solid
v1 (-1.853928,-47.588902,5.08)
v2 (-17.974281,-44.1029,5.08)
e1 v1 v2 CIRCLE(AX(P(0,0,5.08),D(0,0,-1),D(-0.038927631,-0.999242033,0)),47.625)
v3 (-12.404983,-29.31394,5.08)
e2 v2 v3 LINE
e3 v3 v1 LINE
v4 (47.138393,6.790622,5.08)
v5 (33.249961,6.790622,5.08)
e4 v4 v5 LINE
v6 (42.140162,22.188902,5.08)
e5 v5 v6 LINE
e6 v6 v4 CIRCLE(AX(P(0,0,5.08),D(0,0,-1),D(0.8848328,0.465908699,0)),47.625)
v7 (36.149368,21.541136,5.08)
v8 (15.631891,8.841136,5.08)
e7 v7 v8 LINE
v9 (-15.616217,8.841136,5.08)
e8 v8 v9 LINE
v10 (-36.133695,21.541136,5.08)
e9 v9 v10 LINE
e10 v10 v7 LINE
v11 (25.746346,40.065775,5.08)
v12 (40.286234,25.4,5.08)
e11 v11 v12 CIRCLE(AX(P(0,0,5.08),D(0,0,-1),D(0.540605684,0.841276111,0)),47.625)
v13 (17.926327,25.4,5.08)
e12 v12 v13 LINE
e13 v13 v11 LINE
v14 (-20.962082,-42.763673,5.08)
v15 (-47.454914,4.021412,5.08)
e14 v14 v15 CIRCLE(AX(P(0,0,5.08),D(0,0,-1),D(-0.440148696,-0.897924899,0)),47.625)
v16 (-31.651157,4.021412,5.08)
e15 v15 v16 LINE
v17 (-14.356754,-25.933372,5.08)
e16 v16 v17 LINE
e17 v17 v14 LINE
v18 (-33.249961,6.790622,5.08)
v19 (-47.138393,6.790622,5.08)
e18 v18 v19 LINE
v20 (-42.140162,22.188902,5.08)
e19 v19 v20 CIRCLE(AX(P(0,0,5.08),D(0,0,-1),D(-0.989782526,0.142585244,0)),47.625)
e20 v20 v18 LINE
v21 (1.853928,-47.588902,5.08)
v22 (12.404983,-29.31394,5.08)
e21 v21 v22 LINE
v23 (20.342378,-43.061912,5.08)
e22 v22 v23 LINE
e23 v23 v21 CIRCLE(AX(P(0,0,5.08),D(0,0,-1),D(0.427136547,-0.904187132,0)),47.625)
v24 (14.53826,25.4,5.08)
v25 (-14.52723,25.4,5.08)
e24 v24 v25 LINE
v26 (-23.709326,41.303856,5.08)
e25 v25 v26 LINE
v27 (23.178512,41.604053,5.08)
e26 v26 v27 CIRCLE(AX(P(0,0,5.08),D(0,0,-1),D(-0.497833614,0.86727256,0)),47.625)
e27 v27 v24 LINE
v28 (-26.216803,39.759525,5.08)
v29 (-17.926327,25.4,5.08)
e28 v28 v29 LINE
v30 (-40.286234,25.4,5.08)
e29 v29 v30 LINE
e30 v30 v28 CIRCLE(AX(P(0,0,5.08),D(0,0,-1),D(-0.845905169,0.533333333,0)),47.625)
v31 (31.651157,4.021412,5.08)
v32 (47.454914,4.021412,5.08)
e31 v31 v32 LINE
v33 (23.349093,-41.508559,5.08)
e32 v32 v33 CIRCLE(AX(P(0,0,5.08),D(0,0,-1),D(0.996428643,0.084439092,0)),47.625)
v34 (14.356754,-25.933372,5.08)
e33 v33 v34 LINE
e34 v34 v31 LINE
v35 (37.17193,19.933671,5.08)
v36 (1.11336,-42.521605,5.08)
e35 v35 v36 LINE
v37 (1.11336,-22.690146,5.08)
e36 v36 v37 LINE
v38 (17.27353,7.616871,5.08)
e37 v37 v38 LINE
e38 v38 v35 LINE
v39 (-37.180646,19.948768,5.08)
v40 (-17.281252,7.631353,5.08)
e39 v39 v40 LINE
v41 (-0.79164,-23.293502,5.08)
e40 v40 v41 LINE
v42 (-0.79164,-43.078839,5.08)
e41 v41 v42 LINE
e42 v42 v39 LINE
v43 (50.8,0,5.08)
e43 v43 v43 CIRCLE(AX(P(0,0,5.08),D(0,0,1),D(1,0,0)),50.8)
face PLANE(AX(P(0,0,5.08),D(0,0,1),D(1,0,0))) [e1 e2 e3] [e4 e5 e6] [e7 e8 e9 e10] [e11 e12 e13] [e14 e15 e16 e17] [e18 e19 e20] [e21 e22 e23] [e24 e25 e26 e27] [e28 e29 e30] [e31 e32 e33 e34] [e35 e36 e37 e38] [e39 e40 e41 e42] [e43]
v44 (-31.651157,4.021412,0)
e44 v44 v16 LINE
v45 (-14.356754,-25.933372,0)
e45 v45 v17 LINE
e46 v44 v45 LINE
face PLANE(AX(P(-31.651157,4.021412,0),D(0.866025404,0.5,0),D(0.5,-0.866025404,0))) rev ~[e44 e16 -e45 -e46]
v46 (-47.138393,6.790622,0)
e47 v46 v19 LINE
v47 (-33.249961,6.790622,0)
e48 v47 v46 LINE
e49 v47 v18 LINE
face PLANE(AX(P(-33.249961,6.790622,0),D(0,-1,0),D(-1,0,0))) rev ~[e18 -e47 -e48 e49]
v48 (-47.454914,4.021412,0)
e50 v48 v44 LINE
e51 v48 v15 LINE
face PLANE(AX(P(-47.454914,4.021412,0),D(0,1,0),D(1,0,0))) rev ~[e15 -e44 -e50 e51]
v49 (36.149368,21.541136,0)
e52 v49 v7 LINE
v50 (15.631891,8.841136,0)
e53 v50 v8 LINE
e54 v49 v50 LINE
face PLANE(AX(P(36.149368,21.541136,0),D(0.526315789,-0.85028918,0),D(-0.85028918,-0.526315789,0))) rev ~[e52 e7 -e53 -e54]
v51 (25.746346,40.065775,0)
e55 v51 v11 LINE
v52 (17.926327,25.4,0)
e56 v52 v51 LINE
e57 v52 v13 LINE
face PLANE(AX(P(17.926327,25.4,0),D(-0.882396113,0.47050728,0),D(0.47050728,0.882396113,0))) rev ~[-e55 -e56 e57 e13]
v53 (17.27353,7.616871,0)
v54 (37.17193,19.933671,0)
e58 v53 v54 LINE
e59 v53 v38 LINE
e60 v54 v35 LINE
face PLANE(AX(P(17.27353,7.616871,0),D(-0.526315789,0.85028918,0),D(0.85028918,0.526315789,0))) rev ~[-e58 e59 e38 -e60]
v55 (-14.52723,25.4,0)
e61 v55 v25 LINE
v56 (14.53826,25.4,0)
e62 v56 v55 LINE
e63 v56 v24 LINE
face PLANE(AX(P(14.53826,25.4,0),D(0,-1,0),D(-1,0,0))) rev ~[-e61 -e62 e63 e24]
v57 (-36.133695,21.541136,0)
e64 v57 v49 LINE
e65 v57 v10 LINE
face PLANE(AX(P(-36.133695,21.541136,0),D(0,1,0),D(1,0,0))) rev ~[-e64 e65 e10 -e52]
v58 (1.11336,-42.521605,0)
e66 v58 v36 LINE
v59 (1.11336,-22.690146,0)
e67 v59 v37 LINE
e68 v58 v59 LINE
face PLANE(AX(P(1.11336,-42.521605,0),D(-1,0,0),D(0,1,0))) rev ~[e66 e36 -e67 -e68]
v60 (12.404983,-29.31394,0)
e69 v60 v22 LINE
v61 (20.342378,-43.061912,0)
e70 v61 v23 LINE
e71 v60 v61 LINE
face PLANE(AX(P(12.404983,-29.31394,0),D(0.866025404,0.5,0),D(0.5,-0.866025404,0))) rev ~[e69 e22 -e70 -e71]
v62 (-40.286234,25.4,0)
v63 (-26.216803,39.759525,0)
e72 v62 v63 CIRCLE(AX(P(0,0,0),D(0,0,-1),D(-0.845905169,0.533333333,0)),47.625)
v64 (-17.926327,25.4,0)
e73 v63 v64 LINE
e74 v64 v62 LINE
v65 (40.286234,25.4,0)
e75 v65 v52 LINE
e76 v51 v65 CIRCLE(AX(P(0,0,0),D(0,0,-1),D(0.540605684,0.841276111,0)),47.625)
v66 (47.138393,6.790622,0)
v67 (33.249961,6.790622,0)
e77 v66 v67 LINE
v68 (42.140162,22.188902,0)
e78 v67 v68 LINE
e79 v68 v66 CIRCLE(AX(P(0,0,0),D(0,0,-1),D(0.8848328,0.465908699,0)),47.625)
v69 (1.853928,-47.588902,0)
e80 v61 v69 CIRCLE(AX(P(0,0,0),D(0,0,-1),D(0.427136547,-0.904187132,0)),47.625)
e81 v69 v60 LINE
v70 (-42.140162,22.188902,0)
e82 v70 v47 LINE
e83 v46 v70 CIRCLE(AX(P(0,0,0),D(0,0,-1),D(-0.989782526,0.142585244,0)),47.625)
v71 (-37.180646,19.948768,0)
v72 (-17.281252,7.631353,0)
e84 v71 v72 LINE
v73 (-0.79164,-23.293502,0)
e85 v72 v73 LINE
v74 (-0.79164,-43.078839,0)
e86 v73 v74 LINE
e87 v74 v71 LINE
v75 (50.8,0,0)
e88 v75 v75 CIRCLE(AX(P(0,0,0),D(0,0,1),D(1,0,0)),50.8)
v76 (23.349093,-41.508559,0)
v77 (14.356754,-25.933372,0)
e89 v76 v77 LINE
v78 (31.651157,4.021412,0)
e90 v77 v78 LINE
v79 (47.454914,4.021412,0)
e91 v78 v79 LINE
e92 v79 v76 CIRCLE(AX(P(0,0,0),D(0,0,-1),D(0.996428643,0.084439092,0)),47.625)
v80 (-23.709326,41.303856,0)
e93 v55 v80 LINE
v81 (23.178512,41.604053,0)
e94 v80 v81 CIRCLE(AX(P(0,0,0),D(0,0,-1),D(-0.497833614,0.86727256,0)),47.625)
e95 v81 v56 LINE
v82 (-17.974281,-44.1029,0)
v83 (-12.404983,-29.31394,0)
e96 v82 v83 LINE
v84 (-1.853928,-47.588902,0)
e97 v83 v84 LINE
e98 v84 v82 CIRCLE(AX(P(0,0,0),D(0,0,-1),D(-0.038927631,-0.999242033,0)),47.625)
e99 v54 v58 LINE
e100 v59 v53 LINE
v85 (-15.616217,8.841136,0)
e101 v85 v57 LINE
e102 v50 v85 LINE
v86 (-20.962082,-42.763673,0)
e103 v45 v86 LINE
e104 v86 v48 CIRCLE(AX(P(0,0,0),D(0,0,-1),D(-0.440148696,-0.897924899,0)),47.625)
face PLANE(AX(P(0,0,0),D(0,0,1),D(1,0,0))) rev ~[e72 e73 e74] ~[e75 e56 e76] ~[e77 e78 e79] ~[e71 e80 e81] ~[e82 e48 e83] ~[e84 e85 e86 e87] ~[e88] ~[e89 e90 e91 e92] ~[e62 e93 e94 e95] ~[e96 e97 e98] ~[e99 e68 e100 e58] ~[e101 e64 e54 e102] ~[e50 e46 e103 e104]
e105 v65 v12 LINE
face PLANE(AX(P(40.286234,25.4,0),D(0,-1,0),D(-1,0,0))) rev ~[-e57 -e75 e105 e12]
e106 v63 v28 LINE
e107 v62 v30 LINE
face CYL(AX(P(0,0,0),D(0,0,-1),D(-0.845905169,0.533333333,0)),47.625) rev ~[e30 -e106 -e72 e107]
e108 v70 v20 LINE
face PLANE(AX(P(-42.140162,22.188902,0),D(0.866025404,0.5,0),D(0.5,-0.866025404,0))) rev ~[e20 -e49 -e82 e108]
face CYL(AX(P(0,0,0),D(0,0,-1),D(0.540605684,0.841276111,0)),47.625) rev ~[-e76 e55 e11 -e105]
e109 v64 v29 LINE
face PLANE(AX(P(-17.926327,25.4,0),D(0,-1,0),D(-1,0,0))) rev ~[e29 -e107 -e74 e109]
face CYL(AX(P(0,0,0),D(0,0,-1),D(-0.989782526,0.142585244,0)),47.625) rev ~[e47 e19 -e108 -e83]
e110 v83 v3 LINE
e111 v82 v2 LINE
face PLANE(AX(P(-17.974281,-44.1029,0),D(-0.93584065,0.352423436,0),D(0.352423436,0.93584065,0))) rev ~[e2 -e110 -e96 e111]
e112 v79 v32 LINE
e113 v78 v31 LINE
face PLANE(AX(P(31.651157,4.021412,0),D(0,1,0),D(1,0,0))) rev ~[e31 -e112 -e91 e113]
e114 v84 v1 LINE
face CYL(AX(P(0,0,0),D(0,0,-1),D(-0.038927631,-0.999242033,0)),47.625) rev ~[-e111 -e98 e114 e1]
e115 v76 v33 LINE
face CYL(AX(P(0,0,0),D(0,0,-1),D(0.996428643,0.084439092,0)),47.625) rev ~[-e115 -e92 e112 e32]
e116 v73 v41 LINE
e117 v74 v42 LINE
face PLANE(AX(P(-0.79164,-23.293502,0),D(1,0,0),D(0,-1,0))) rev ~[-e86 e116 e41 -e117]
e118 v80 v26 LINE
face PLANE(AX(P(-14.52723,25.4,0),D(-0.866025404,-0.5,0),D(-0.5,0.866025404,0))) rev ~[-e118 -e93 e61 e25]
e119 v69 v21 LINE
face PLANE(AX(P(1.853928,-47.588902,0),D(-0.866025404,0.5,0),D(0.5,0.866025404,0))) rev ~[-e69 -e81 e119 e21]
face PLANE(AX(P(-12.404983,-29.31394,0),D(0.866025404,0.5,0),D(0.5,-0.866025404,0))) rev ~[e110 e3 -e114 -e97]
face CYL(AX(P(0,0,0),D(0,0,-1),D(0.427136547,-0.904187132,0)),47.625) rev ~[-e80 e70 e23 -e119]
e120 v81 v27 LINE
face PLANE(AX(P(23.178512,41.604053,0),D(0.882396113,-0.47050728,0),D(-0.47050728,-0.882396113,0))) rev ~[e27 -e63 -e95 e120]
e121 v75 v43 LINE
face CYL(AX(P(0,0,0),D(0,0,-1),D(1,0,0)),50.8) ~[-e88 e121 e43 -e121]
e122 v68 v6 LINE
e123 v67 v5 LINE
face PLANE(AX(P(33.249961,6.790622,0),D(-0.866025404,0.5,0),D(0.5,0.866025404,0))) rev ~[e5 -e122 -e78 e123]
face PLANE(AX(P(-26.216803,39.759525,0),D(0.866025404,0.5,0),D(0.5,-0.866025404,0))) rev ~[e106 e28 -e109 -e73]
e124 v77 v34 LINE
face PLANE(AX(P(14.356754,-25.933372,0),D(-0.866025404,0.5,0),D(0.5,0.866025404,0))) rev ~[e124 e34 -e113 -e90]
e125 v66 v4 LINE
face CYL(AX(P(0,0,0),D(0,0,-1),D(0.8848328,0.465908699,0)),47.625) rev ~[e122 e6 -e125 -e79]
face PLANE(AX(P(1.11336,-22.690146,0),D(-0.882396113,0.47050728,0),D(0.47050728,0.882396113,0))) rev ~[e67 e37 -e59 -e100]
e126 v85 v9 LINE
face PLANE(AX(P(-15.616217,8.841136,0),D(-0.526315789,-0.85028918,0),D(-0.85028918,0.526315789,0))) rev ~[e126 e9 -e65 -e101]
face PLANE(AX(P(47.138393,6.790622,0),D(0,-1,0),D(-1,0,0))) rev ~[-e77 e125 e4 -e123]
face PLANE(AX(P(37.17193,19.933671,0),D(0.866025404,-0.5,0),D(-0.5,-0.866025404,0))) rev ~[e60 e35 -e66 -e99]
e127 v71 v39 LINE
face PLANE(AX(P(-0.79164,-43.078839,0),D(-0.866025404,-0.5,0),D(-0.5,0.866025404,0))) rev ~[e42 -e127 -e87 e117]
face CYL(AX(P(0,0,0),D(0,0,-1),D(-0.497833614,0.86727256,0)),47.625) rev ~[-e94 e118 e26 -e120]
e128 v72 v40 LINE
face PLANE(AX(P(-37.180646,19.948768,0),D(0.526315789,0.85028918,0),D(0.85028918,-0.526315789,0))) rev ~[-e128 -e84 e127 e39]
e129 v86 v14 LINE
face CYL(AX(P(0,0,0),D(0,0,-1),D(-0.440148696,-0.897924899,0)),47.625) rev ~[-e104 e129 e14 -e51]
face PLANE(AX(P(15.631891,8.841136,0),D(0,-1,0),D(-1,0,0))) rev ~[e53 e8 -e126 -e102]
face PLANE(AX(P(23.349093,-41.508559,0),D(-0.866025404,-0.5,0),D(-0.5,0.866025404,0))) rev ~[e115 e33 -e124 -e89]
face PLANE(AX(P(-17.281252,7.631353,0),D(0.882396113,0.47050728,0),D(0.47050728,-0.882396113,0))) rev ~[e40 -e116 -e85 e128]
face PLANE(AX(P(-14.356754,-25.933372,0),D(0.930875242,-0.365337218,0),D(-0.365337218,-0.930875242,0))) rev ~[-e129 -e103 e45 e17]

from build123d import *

# Parameters (mm, degrees)
F0_R     = 50.8
F1_DEPTH = 5.08


# Not quite as in the source:
# - a feature names something its author has since deleted; it is built from what else it names


with BuildPart() as f1:
    # F0 (on Top) → F1 (new body)
    with BuildSketch(Plane.XY):
        Circle(F0_R)
        with BuildLine():
            Line((-17.9742814731, -44.1029004775), (-12.4049825801, -29.3139399042))
            Line((-12.4049825801, -29.3139399042), (-1.8539284107, -47.5889017991))
            ThreePointArc((-1.8539284107, -47.5889017991), (-10.066157564, -46.549039699), (-17.9742814731, -44.1029004775))
        make_face(mode=Mode.SUBTRACT)
        with BuildLine():
            ThreePointArc((-20.9620816677, -42.7636733356), (-41.4419156704, -23.4671738939), (-47.4549141022, 4.0214117617))
            Line((-47.4549141022, 4.0214117617), (-31.651156838, 4.0214117617))
            Line((-31.651156838, 4.0214117617), (-14.3567544825, -25.9333718046))
            Line((-14.3567544825, -25.9333718046), (-20.9620816677, -42.7636733356))
        make_face(mode=Mode.SUBTRACT)
        Polygon((-0.7916404097, -43.0788385891), (-37.1806461747, 19.9487682329), (-17.281252241, 7.6313526128), (-0.7916404097, -23.293502324), align=None, mode=Mode.SUBTRACT)
        with BuildLine():
            ThreePointArc((20.3423780674, -43.061912168), (11.3266241262, -46.2584933921), (1.8539284107, -47.5889017991))
            Line((1.8539284107, -47.5889017991), (12.4049825801, -29.3139399042))
            Line((12.4049825801, -29.3139399042), (20.3423780674, -43.061912168))
        make_face(mode=Mode.SUBTRACT)
        Polygon((17.2735304892, 7.6168711285), (37.1719298571, 19.9336711278), (1.1133595903, -42.5216046224), (1.1133595903, -22.6901455503), align=None, mode=Mode.SUBTRACT)
        with BuildLine():
            Line((14.3567544825, -25.9333718046), (31.651156838, 4.0214117617))
            Line((31.651156838, 4.0214117617), (47.4549141022, 4.0214117617))
            ThreePointArc((47.4549141022, 4.0214117617), (42.0897424453, -22.2843937743), (23.3490930586, -41.5085590974))
            Line((23.3490930586, -41.5085590974), (14.3567544825, -25.9333718046))
        make_face(mode=Mode.SUBTRACT)
        with BuildLine():
            ThreePointArc((-47.1383927866, 6.7906222465), (-45.2983646948, 14.7036995676), (-42.1401621016, 22.1889017991))
            Line((-42.1401621016, 22.1889017991), (-33.2499612568, 6.7906222465))
            Line((-33.2499612568, 6.7906222465), (-47.1383927866, 6.7906222465))
        make_face(mode=Mode.SUBTRACT)
        with BuildLine():
            Line((-17.9263273651, 25.4), (-40.2862336909, 25.4))
            ThreePointArc((-40.2862336909, 25.4), (-34.0178257765, 33.3305888703), (-26.2168031881, 39.7595253442))
            Line((-26.2168031881, 39.7595253442), (-17.9263273651, 25.4))
        make_face(mode=Mode.SUBTRACT)
        with BuildLine():
            ThreePointArc((-23.7093258464, 41.3038556664), (-0.3049103548, 47.6240239236), (23.1785122433, 41.6040526293))
            Line((23.1785122433, 41.6040526293), (14.5382603004, 25.4))
            Line((14.5382603004, 25.4), (-14.5272304963, 25.4))
            Line((-14.5272304963, 25.4), (-23.7093258464, 41.3038556664))
        make_face(mode=Mode.SUBTRACT)
        Polygon((-15.6162167432, 8.8411357684), (-36.1336946584, 21.5411357684), (36.1493684604, 21.5411357684), (15.6318905452, 8.8411357684), align=None, mode=Mode.SUBTRACT)
        with BuildLine():
            Line((47.1383927866, 6.7906222465), (33.2499612568, 6.7906222465))
            Line((33.2499612568, 6.7906222465), (42.1401621016, 22.1889017991))
            ThreePointArc((42.1401621016, 22.1889017991), (45.2983646948, 14.7036995676), (47.1383927866, 6.7906222465))
        make_face(mode=Mode.SUBTRACT)
        with BuildLine():
            Line((40.2862336909, 25.4), (17.9263273651, 25.4))
            Line((17.9263273651, 25.4), (25.7463457142, 40.065774763))
            ThreePointArc((25.7463457142, 40.065774763), (33.8208016326, 33.5304936129), (40.2862336909, 25.4))
        make_face(mode=Mode.SUBTRACT)
    extrude(amount=F1_DEPTH)


solid = f1.part
